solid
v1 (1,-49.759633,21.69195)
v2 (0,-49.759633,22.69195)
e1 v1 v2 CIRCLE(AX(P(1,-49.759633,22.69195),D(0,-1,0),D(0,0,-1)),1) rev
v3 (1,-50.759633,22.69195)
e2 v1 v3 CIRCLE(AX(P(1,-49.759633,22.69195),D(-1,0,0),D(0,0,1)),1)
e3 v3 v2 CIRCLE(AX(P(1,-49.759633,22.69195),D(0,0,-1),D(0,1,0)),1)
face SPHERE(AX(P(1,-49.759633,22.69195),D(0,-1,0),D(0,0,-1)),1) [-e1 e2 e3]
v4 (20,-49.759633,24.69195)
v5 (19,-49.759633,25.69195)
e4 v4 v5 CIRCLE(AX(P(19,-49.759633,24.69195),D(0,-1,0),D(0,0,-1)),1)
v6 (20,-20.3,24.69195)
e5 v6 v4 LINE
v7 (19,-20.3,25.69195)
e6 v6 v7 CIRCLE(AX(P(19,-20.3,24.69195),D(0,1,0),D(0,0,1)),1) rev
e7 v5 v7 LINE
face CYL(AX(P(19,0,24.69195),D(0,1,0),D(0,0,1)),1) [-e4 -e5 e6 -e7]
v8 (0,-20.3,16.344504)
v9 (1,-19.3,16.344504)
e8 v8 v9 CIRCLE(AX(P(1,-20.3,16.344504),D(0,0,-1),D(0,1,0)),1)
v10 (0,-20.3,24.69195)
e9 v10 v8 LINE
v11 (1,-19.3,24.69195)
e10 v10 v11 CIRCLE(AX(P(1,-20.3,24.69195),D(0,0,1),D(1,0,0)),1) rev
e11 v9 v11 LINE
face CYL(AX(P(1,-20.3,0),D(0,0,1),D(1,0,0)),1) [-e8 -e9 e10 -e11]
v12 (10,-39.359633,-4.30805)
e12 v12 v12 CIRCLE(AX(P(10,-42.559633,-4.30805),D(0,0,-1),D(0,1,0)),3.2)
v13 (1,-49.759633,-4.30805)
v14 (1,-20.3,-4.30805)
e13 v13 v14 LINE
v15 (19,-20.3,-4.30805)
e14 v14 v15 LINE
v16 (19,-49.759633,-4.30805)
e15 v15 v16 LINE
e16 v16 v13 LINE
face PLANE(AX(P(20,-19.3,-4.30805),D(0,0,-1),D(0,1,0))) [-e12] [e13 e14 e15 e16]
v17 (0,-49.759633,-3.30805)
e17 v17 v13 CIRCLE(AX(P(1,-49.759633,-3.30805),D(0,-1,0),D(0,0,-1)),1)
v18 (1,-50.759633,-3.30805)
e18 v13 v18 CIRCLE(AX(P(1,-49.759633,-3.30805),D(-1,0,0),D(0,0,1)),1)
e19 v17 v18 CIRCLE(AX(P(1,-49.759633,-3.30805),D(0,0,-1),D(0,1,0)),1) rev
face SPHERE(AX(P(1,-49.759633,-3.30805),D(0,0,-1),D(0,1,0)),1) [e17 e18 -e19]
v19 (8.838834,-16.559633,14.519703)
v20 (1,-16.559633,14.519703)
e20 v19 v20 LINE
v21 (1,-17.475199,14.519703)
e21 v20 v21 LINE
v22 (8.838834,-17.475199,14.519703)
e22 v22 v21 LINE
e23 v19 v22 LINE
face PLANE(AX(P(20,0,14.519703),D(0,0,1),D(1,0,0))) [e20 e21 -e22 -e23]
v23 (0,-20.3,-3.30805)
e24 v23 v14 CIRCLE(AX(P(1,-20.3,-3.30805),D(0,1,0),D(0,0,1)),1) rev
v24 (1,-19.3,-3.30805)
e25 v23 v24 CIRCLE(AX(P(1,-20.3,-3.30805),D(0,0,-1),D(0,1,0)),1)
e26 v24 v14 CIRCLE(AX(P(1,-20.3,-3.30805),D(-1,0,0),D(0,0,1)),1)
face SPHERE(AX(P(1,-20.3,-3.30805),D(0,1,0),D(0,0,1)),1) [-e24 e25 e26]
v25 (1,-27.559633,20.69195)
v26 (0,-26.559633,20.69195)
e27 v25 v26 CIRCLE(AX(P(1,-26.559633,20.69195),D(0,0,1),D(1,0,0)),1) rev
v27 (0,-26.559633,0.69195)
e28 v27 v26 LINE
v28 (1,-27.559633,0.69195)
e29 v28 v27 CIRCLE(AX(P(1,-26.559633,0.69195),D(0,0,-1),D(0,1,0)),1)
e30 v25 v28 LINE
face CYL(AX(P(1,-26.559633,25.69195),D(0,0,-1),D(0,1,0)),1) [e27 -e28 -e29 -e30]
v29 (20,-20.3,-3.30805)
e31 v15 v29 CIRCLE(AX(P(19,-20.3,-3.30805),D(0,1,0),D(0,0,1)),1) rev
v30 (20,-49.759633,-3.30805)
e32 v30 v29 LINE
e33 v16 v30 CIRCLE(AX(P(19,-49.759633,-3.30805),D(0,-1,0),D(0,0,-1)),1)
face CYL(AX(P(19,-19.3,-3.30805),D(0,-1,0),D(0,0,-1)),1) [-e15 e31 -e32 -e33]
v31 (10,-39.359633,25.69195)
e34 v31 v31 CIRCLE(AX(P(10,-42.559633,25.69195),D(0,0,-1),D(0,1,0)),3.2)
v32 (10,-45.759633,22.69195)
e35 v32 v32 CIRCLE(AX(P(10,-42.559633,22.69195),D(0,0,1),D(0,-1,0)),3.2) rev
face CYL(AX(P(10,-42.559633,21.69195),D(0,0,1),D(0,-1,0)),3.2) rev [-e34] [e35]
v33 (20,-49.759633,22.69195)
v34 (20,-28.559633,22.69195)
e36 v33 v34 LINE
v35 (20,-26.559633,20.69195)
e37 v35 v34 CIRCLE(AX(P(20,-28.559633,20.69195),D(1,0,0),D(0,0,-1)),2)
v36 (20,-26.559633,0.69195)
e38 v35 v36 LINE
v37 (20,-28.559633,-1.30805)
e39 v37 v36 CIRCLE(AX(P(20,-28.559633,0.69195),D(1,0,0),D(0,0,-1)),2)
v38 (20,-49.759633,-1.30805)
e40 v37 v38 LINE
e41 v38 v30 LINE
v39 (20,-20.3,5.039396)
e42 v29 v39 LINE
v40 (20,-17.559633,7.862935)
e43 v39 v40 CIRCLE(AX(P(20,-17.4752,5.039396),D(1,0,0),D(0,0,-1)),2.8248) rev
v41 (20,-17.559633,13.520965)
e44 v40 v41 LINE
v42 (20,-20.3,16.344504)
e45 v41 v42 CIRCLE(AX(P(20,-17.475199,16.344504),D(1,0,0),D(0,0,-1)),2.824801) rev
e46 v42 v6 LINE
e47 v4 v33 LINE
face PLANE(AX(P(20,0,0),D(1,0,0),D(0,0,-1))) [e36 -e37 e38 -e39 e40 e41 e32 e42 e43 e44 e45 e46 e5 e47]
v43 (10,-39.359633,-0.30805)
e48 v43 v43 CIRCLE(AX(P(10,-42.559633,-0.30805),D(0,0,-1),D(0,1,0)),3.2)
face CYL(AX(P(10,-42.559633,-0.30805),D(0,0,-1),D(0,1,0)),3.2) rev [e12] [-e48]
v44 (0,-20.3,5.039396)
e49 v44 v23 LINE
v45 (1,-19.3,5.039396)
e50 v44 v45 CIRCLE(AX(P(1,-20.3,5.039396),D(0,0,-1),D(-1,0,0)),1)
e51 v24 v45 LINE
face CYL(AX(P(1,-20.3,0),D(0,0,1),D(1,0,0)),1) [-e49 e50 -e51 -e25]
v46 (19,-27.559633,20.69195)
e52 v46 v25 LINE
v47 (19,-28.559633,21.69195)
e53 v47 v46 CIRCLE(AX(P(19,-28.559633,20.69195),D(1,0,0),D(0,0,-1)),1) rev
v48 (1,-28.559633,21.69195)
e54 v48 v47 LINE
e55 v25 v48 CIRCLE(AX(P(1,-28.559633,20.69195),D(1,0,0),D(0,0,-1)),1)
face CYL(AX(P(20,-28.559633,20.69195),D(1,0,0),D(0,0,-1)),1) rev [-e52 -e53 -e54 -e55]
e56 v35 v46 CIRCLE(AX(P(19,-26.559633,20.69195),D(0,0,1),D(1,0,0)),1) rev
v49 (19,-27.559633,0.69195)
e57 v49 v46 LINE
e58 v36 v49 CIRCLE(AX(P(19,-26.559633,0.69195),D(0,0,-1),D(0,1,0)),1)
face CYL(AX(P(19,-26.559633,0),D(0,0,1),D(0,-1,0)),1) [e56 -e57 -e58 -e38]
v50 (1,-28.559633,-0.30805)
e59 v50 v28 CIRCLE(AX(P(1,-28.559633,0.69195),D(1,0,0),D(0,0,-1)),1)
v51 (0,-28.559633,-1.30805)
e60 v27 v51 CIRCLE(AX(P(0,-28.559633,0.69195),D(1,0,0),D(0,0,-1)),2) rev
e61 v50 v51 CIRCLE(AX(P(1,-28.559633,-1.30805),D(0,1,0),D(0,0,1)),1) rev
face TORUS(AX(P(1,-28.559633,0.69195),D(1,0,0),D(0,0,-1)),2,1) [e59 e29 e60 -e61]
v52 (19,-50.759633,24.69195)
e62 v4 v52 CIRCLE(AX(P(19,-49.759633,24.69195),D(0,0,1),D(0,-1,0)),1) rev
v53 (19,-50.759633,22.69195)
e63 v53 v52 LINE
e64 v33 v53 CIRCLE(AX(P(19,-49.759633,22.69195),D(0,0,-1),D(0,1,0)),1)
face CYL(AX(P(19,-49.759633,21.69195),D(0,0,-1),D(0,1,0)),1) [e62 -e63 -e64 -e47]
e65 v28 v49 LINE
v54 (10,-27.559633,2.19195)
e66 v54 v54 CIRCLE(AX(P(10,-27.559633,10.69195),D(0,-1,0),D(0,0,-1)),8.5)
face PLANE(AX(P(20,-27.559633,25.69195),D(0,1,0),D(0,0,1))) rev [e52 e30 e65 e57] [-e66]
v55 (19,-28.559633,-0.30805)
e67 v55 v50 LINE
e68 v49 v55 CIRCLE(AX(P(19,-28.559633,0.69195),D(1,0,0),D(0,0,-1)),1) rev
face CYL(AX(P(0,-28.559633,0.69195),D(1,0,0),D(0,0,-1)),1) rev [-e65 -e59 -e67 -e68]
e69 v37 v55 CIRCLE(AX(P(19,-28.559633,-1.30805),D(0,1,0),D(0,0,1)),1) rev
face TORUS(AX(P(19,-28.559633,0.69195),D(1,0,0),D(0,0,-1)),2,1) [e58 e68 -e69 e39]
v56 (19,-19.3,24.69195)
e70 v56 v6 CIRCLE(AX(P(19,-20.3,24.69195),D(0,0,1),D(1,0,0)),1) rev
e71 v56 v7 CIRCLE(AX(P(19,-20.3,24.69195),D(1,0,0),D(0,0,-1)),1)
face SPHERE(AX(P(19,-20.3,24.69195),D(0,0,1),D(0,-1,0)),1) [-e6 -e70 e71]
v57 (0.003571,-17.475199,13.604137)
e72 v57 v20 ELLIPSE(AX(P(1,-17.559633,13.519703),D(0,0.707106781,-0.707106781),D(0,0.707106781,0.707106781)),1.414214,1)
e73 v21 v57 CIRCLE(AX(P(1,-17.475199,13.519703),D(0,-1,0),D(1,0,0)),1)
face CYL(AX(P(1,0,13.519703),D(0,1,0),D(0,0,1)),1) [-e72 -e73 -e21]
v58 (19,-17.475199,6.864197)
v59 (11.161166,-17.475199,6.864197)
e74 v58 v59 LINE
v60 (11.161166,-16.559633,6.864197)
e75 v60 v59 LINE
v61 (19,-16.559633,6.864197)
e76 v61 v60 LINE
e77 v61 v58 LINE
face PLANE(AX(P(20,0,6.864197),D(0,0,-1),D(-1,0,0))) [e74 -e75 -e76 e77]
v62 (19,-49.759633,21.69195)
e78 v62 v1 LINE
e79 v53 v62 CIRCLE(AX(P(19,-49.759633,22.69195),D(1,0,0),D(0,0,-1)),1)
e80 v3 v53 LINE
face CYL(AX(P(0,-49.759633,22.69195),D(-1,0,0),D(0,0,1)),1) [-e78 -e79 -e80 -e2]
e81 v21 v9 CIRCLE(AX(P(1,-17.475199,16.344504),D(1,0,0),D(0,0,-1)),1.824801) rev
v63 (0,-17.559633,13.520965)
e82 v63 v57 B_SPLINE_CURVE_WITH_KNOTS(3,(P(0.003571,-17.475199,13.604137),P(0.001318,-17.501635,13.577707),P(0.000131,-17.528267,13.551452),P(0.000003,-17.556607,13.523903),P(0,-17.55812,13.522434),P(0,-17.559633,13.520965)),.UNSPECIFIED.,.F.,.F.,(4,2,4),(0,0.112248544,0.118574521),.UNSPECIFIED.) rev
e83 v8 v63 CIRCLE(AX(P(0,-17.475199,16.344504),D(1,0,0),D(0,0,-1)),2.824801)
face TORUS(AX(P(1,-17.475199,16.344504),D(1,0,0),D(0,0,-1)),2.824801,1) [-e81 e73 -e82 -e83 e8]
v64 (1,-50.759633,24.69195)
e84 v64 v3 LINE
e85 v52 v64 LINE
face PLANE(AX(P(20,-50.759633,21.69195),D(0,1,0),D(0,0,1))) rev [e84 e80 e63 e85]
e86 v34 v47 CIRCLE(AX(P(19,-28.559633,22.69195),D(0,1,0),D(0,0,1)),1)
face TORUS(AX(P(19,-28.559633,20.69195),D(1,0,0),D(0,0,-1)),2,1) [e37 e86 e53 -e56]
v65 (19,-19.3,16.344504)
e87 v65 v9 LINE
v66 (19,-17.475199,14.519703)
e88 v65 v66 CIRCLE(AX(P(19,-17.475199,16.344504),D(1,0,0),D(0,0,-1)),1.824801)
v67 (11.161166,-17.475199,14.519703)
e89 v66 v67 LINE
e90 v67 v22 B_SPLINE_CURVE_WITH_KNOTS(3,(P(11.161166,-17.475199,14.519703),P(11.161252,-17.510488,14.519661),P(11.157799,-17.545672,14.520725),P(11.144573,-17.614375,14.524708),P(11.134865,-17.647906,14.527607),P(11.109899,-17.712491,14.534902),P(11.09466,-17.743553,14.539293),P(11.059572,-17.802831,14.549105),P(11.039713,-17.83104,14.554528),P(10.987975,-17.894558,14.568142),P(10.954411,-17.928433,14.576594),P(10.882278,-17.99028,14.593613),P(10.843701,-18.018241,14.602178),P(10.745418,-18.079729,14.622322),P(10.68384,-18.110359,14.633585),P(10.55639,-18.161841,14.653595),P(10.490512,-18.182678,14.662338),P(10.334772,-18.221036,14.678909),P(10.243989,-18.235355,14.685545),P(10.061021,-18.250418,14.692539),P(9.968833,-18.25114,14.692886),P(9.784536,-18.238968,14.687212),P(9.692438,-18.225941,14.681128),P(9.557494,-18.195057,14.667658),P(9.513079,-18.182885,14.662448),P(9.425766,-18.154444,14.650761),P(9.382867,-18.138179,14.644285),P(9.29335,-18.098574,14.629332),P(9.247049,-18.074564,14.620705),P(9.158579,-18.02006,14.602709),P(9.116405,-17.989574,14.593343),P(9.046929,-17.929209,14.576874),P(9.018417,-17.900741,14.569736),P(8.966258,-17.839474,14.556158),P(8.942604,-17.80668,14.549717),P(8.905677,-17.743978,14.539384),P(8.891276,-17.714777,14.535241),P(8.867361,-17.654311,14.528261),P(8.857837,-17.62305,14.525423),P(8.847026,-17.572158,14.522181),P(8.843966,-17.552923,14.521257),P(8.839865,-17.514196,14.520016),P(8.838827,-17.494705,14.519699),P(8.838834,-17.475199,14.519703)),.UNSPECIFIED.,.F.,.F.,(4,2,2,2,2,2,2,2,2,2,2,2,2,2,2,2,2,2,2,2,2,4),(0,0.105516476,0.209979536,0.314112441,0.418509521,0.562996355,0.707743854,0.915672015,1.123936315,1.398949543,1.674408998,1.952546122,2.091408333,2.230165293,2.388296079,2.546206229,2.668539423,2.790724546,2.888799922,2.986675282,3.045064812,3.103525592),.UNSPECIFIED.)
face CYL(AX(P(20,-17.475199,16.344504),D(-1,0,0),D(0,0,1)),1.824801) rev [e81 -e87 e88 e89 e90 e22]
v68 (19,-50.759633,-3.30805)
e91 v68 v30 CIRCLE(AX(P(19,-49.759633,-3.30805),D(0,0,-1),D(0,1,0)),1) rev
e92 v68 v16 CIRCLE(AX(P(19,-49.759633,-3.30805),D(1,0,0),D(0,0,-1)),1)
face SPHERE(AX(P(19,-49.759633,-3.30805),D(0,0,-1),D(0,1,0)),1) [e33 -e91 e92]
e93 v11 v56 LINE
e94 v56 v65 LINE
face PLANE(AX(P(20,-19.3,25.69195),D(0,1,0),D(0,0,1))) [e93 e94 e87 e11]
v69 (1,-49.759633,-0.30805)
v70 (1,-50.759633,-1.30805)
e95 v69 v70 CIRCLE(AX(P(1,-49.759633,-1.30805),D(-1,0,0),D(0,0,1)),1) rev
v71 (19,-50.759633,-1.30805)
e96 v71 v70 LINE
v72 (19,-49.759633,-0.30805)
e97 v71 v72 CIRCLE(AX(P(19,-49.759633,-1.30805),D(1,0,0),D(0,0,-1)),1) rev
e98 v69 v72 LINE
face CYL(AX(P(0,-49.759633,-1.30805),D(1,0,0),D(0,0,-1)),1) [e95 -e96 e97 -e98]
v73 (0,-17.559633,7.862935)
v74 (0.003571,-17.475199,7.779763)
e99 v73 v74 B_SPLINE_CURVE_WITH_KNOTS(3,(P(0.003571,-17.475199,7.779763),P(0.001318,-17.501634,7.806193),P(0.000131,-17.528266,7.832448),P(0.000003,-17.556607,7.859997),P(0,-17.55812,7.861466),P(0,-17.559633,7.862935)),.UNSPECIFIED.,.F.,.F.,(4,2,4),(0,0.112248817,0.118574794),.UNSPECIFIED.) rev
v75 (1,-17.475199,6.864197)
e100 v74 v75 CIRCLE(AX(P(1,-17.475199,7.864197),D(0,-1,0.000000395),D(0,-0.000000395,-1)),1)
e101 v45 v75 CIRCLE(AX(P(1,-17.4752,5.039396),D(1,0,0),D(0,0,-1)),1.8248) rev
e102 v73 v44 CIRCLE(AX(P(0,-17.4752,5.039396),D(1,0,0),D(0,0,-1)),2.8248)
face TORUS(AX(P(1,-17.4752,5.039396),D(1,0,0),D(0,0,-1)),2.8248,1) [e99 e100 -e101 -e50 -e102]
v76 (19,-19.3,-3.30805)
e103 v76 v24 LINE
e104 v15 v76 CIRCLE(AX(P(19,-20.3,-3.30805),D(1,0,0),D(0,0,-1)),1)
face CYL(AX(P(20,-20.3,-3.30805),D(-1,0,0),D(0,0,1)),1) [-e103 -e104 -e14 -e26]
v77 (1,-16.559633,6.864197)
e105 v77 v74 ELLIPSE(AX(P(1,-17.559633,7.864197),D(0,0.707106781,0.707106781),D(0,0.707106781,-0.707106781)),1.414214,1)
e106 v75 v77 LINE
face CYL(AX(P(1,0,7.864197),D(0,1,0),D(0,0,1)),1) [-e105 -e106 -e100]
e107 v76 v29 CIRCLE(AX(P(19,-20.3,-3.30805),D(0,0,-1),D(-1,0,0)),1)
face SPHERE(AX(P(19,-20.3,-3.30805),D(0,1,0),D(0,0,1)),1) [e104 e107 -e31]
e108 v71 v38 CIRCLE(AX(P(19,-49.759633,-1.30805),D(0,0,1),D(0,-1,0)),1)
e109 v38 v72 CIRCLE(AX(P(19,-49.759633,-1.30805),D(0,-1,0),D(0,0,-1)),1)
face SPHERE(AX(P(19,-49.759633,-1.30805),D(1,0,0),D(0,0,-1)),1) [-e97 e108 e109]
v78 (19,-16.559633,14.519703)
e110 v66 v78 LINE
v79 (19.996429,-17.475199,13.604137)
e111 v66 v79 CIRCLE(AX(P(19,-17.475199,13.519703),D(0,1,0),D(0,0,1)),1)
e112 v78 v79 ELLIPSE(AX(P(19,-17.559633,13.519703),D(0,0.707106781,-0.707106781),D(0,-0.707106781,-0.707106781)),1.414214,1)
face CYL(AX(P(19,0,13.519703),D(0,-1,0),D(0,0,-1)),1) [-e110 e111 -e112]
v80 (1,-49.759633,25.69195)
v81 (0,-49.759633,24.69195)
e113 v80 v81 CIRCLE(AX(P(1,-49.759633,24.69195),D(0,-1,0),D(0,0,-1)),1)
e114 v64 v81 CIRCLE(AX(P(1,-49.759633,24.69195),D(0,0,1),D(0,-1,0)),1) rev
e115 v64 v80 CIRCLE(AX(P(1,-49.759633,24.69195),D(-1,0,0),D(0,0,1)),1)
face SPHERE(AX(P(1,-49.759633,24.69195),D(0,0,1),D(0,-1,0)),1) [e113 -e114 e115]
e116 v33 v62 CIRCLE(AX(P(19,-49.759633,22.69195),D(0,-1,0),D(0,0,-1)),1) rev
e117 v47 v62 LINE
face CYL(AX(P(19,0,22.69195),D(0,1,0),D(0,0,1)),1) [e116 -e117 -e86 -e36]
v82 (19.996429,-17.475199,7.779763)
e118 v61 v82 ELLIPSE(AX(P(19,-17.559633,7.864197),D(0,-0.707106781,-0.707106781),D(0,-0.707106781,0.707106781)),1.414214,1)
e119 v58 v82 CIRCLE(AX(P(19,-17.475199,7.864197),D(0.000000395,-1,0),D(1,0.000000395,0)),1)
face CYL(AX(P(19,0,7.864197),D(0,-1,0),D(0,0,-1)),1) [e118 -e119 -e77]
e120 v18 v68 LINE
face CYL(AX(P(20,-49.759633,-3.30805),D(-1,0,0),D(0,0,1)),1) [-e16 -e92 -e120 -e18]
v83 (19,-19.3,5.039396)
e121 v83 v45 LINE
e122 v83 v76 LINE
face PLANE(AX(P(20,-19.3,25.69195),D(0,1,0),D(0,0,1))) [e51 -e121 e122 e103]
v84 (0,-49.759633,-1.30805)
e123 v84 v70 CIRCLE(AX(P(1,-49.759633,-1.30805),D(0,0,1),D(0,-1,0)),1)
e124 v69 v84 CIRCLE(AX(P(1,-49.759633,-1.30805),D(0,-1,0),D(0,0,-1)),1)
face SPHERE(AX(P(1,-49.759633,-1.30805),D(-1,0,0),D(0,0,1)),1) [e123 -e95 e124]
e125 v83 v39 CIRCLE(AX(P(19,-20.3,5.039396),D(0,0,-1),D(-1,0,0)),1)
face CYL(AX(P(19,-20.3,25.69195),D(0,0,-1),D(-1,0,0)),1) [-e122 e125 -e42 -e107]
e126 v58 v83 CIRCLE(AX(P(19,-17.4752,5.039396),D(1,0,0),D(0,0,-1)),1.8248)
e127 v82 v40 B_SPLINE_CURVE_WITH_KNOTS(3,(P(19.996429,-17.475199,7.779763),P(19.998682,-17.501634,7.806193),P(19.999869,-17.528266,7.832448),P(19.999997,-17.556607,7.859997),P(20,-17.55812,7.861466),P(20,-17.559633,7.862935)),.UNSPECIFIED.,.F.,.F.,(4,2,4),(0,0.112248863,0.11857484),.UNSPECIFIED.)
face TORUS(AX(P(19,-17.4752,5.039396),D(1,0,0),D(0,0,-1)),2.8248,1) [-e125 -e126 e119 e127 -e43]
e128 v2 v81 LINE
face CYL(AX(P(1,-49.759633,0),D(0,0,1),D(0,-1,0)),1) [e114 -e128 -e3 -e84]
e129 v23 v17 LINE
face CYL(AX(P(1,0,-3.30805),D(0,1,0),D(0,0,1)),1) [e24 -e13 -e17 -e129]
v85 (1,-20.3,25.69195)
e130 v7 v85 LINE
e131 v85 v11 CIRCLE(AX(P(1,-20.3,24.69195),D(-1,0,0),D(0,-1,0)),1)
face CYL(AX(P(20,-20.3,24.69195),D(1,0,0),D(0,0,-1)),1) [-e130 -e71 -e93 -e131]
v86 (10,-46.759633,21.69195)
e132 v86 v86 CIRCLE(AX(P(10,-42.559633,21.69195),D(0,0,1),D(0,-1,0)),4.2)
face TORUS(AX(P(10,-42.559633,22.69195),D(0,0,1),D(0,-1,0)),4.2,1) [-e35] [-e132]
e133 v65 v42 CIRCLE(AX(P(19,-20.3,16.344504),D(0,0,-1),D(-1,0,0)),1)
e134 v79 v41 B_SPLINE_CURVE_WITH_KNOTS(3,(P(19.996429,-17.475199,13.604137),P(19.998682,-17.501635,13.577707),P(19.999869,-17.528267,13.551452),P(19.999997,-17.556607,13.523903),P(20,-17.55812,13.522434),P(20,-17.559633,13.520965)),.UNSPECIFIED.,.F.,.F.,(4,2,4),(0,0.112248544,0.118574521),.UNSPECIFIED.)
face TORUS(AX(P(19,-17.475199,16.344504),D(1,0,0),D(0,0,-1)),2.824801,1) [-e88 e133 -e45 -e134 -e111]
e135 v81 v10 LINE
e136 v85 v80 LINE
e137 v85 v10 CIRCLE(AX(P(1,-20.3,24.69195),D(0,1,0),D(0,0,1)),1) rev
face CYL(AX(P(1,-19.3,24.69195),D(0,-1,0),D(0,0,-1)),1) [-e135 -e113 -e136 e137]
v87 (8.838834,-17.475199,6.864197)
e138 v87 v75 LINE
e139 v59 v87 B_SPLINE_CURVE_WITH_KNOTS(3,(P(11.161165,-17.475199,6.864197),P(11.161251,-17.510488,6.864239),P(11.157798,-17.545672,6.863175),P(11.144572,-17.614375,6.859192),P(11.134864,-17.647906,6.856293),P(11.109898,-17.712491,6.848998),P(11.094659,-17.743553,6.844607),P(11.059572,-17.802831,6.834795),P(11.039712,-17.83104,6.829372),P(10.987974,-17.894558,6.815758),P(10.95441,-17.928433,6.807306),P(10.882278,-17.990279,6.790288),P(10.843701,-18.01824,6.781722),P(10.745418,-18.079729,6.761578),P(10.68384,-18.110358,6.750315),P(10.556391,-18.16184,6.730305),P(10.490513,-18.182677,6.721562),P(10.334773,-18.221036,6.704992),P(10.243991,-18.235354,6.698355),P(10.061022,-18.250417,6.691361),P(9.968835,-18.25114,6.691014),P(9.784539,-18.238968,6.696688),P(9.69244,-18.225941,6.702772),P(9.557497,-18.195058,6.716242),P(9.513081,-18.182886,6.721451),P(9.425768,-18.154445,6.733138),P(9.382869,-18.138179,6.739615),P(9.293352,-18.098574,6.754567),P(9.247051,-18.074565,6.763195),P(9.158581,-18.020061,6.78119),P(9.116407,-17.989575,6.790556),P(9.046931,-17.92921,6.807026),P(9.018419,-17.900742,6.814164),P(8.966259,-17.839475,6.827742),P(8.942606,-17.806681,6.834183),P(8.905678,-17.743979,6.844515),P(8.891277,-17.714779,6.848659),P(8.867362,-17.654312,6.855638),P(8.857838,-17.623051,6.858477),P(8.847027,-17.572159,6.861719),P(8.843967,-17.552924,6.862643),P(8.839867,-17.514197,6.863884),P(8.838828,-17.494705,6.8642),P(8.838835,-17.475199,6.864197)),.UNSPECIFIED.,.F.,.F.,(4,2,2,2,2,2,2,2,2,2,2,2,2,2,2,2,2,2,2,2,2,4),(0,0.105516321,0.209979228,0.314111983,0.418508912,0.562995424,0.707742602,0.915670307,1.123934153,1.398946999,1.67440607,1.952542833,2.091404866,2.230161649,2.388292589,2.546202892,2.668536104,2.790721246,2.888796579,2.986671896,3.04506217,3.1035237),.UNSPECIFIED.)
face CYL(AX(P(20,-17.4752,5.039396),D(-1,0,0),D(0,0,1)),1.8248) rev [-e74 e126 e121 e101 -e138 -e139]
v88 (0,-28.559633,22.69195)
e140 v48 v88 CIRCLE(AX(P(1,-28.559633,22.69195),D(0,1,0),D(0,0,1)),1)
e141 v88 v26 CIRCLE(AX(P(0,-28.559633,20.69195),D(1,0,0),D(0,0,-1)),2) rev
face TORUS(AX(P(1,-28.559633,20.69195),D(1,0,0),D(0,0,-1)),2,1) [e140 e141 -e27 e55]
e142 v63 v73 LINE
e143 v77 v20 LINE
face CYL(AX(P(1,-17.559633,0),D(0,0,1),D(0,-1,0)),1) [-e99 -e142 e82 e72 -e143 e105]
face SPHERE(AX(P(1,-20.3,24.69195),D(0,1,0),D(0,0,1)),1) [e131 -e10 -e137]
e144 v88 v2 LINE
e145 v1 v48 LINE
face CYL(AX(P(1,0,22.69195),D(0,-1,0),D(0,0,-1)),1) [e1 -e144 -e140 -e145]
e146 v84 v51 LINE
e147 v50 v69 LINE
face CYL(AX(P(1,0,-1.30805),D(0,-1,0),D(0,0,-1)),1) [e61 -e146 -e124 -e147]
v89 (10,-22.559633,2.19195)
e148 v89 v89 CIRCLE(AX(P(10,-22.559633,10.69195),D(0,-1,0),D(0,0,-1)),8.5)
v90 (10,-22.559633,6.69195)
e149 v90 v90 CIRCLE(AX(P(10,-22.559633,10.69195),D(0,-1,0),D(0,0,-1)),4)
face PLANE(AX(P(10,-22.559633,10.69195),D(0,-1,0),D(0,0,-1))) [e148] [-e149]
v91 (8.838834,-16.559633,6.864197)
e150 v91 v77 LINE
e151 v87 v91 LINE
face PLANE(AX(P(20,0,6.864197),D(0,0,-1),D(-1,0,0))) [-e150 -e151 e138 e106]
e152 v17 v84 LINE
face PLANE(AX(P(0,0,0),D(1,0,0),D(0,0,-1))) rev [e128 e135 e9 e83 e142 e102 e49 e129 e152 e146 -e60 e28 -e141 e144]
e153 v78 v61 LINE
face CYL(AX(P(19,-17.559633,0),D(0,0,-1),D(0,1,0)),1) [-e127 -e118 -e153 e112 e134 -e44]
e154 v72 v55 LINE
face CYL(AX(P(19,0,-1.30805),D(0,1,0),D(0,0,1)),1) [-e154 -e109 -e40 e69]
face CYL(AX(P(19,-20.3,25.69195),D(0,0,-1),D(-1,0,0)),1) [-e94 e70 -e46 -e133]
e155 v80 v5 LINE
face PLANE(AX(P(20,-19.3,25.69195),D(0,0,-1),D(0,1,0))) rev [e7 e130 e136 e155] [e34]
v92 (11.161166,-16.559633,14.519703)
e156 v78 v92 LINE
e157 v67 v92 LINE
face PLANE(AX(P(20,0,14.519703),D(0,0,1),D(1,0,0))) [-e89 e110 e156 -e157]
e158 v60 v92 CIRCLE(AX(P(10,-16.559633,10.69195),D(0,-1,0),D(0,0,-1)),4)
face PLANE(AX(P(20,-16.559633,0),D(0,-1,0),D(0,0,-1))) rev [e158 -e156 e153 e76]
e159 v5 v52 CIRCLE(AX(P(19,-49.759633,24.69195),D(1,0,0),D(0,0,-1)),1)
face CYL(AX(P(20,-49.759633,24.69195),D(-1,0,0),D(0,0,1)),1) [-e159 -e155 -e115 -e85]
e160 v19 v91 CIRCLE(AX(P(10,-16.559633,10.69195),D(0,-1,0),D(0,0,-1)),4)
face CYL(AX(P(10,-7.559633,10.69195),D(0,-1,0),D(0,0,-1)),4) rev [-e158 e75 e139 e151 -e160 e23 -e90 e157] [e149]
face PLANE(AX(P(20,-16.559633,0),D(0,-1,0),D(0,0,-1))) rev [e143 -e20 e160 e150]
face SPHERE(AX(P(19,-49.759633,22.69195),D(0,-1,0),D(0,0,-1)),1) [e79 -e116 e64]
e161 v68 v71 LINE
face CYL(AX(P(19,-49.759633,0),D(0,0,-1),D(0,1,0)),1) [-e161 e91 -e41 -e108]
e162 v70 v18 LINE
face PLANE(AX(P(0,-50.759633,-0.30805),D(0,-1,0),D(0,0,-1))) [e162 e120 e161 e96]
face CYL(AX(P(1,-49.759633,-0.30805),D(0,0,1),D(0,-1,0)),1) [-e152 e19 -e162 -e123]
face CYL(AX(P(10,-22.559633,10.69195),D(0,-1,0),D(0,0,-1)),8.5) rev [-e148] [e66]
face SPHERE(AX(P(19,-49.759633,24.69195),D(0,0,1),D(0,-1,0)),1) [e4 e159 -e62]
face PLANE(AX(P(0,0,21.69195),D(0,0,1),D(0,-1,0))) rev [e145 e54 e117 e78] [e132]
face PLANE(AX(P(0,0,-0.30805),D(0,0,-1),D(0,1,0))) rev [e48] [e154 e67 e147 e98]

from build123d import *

# Parameters (mm, degrees)
SKETCH1_W           = 30
SKETCH1_H           = 8.25963266
BOSS_EXTRUDE1_DEPTH = 20
SKETCH2_R           = 4
CUT_EXTRUDE1_DEPTH  = 20
SKETCH2_3_R         = 8.5
SKETCH2_3_R_2       = 4
CUT_EXTRUDE2_DEPTH  = 5
SKETCH3_W           = 20
SKETCH3_H           = 23.2
SKETCH3_R           = 5
SKETCH3_R_2         = 3.2
BOSS_EXTRUDE2_DEPTH = 4
BOSS_EXTRUDE3_START = -26
SKETCH3_3_W         = 20
SKETCH3_3_H         = 23.2
SKETCH3_3_R         = 5
SKETCH3_3_R_2       = 3.2
BOSS_EXTRUDE3_DEPTH = 4
FILLET1_R           = 1


with BuildPart() as part:
    # Sketch1 → Boss-Extrude1 (new body)
    with BuildSketch(Plane(origin=(0, 0, 0), x_dir=(0, 0, -1), z_dir=(1, 0, 0))):
        with Locations((-10.691950058, -23.429816412)):
            Rectangle(SKETCH1_W, SKETCH1_H)
        with BuildLine():
            Line((-16.344503942, -19.300000082), (-5.039396175, -19.300000082))
            ThreePointArc((-5.039396175, -19.300000082), (-6.329725463, -18.765528762), (-6.864196994, -17.475199263))
            Line((-6.864196994, -17.475199263), (-6.864196994, -16.559632742))
            Line((-6.864196994, -16.559632742), (-14.519703122, -16.559632742))
            Line((-14.519703122, -16.559632742), (-14.519703122, -17.475199263))
            ThreePointArc((-14.519703122, -17.475199263), (-15.054174908, -18.765528296), (-16.344503942, -19.300000082))
        make_face()
    extrude(amount=BOSS_EXTRUDE1_DEPTH)

    # Sketch2 → Cut-Extrude1 (cut)
    with BuildSketch(Plane.XZ.offset(27.559632742)):
        with Locations(Location((10, 10.691950058, 0), (0, 0, 270))):
            Circle(SKETCH2_R)
    extrude(amount=-CUT_EXTRUDE1_DEPTH, mode=Mode.SUBTRACT)

    # Sketch2<3> → Cut-Extrude2 (cut)
    with BuildSketch(Plane.XZ.offset(27.559632742)):
        with Locations(Location((10, 10.691950058, 0), (0, 0, 270))):
            Circle(SKETCH2_3_R)
        with Locations(Location((10, 10.691950058, 0), (0, 0, 270))):
            Circle(SKETCH2_3_R_2, mode=Mode.SUBTRACT)
    extrude(amount=-CUT_EXTRUDE2_DEPTH, mode=Mode.SUBTRACT)

    # Sketch3 → Boss-Extrude2 (add)
    # profile 1 of 2: a face of its own
    with BuildSketch(Plane(origin=(0, 0, -4.308049942), x_dir=(-1, 0, 0), z_dir=(0, 0, -1))):
        with Locations((-10, -39.159632742)):
            Rectangle(SKETCH3_W, SKETCH3_H)
        with Locations((-10, -42.559632742)):
            Circle(SKETCH3_R, mode=Mode.SUBTRACT)
    # profile 2 of 2: a face of its own
    with BuildSketch(Plane(origin=(0, 0, -4.308049942), x_dir=(-1, 0, 0), z_dir=(0, 0, -1))):
        with Locations((-10, -42.559632742)):
            Circle(SKETCH3_R)
        with Locations(Location((-10, -42.559632742, 0), (0, 0, 90))):
            Circle(SKETCH3_R_2, mode=Mode.SUBTRACT)
    extrude(amount=-BOSS_EXTRUDE2_DEPTH)

    # Sketch3<3> → Boss-Extrude3 (add)
    # profile 1 of 2: a face of its own
    with BuildSketch(Plane(origin=(0, 0, -4.308049942), x_dir=(-1, 0, 0), z_dir=(0, 0, -1)).offset(BOSS_EXTRUDE3_START)):
        with Locations((-10, -39.159632742)):
            Rectangle(SKETCH3_3_W, SKETCH3_3_H)
        with Locations((-10, -42.559632742)):
            Circle(SKETCH3_3_R, mode=Mode.SUBTRACT)
    # profile 2 of 2: a face of its own
    with BuildSketch(Plane(origin=(0, 0, -4.308049942), x_dir=(-1, 0, 0), z_dir=(0, 0, -1)).offset(BOSS_EXTRUDE3_START)):
        with Locations((-10, -42.559632742)):
            Circle(SKETCH3_3_R)
        with Locations(Location((-10, -42.559632742, 0), (0, 0, 90))):
            Circle(SKETCH3_3_R_2, mode=Mode.SUBTRACT)
    extrude(amount=-BOSS_EXTRUDE3_DEPTH)

    # Fillet1
    # the kernel refuses this fillet: 1 mm, written as the material it adds along each edge
    with BuildSketch(Plane(origin=(20, -27.559632742, -0.308049942), x_dir=(0, 0, 1), z_dir=(-1, 0, 0)), Plane(origin=(20, -27.559632742, 21.691950058), x_dir=(0, -1, 0), z_dir=(-1, 0, 0))) as fillet1_piece_1:
        with BuildLine():
            CenterArc((FILLET1_R, -FILLET1_R), FILLET1_R, 90, 90)
            Line((0, -FILLET1_R), (0, 0))
            Line((0, 0), (FILLET1_R, 0))
        make_face()
    extrude(amount=20)
    # the kernel refuses this fillet: 1 mm, written as the material it takes off along each edge
    with BuildSketch(Plane(origin=(19, -20.300000082, -3.308049942), x_dir=(0, 0, -1), z_dir=(0, 1, 0))) as fillet1_2_piece_1_section:
        Polygon((0, 0), (FILLET1_R, 0), (FILLET1_R, -FILLET1_R), (0, -FILLET1_R), align=None)
    fillet1_2_piece_1 = extrude(amount=FILLET1_R, mode=Mode.PRIVATE)
    fillet1_2_piece_1 = fillet1_2_piece_1 - Plane(origin=(19, -20.300000082, -3.308049942), x_dir=(-0.7071067811865475, -2.5852550975749018e-14, 0.7071067811865475), z_dir=(0, 1, 0)) * Sphere(FILLET1_R, mode=Mode.PRIVATE)
    add(fillet1_2_piece_1, mode=Mode.SUBTRACT)
    with BuildSketch(Plane(origin=(19, -49.759632742, -3.308049942), x_dir=(0, 0, -1), z_dir=(0, -1, 0))) as fillet1_2_piece_2_section:
        Polygon((0, 0), (FILLET1_R, 0), (FILLET1_R, FILLET1_R), (0, FILLET1_R), align=None)
    fillet1_2_piece_2 = extrude(amount=FILLET1_R, mode=Mode.PRIVATE)
    fillet1_2_piece_2 = fillet1_2_piece_2 - Plane(origin=(19, -49.759632742, -3.308049942), x_dir=(-0.7071067811865475, -2.5852550975749018e-14, 0.7071067811865475), z_dir=(0, -1, 0)) * Sphere(FILLET1_R, mode=Mode.PRIVATE)
    add(fillet1_2_piece_2, mode=Mode.SUBTRACT)
    with BuildSketch(Plane(origin=(19, -20.300000082, 24.691950058), x_dir=(1, 0, 0), z_dir=(0, 1, 0))) as fillet1_2_piece_3_section:
        Polygon((0, 0), (FILLET1_R, 0), (FILLET1_R, -FILLET1_R), (0, -FILLET1_R), align=None)
    fillet1_2_piece_3 = extrude(amount=FILLET1_R, mode=Mode.PRIVATE)
    fillet1_2_piece_3 = fillet1_2_piece_3 - Plane(origin=(19, -20.300000082, 24.691950058), x_dir=(-0.7071067811865475, 2.5852550975749008e-14, -0.7071067811865475), z_dir=(0, 1, 0)) * Sphere(FILLET1_R, mode=Mode.PRIVATE)
    add(fillet1_2_piece_3, mode=Mode.SUBTRACT)
    with BuildSketch(Plane(origin=(19, -49.759632742, 24.691950058), x_dir=(0, 0, 1), z_dir=(1, 0, 0))) as fillet1_2_piece_4_section:
        Polygon((0, 0), (FILLET1_R, 0), (FILLET1_R, FILLET1_R), (0, FILLET1_R), align=None)
    fillet1_2_piece_4 = extrude(amount=FILLET1_R, mode=Mode.PRIVATE)
    fillet1_2_piece_4 = fillet1_2_piece_4 - Plane(origin=(19, -49.759632742, 24.691950058), x_dir=(0, 0.7071067811865733, -0.7071067811865216), z_dir=(1, 0, 0)) * Sphere(FILLET1_R, mode=Mode.PRIVATE)
    add(fillet1_2_piece_4, mode=Mode.SUBTRACT)
    with BuildSketch(Plane(origin=(1, -20.300000082, 24.691950058), x_dir=(-1, 0, 0), z_dir=(0, 1, 0))) as fillet1_2_piece_5_section:
        Polygon((0, 0), (FILLET1_R, 0), (FILLET1_R, FILLET1_R), (0, FILLET1_R), align=None)
    fillet1_2_piece_5 = extrude(amount=FILLET1_R, mode=Mode.PRIVATE)
    fillet1_2_piece_5 = fillet1_2_piece_5 - Plane(origin=(1, -20.300000082, 24.691950058), x_dir=(0.7071067811865475, 2.5852550975749008e-14, -0.7071067811865475), z_dir=(0, 1, 0)) * Sphere(FILLET1_R, mode=Mode.PRIVATE)
    add(fillet1_2_piece_5, mode=Mode.SUBTRACT)
    with BuildSketch(Plane(origin=(1, -49.759632742, 24.691950058), x_dir=(0, 0, 1), z_dir=(-1, 0, 0))) as fillet1_2_piece_6_section:
        Polygon((0, 0), (FILLET1_R, 0), (FILLET1_R, -FILLET1_R), (0, -FILLET1_R), align=None)
    fillet1_2_piece_6 = extrude(amount=FILLET1_R, mode=Mode.PRIVATE)
    fillet1_2_piece_6 = fillet1_2_piece_6 - Plane(origin=(1, -49.759632742, 24.691950058), x_dir=(0, 0.7071067811865733, -0.7071067811865216), z_dir=(-1, 0, 0)) * Sphere(FILLET1_R, mode=Mode.PRIVATE)
    add(fillet1_2_piece_6, mode=Mode.SUBTRACT)
    with BuildSketch(Plane(origin=(1, -49.759632742, -3.308049942), x_dir=(0, 0, -1), z_dir=(-1, 0, 0))) as fillet1_2_piece_7_section:
        Polygon((0, 0), (FILLET1_R, 0), (FILLET1_R, FILLET1_R), (0, FILLET1_R), align=None)
    fillet1_2_piece_7 = extrude(amount=FILLET1_R, mode=Mode.PRIVATE)
    fillet1_2_piece_7 = fillet1_2_piece_7 - Plane(origin=(1, -49.759632742, -3.308049942), x_dir=(0, 0.7071067811865216, 0.7071067811865733), z_dir=(-1, 0, 0)) * Sphere(FILLET1_R, mode=Mode.PRIVATE)
    add(fillet1_2_piece_7, mode=Mode.SUBTRACT)
    with BuildSketch(Plane(origin=(1, -20.300000082, -3.308049942), x_dir=(0, 0, -1), z_dir=(-1, 0, 0))) as fillet1_2_piece_8_section:
        Polygon((0, 0), (FILLET1_R, 0), (FILLET1_R, -FILLET1_R), (0, -FILLET1_R), align=None)
    fillet1_2_piece_8 = extrude(amount=FILLET1_R, mode=Mode.PRIVATE)
    fillet1_2_piece_8 = fillet1_2_piece_8 - Plane(origin=(1, -20.300000082, -3.308049942), x_dir=(0, -0.7071067811865605, 0.7071067811865346), z_dir=(-1, 0, 0)) * Sphere(FILLET1_R, mode=Mode.PRIVATE)
    add(fillet1_2_piece_8, mode=Mode.SUBTRACT)
    with BuildSketch(Plane(origin=(-2.5, -50.759632742, -0.308049942), x_dir=(0, 0, -1), z_dir=(1, 0, 0)), Plane(origin=(-2.5, -50.759632742, 21.691950058), x_dir=(0, 1, 0), z_dir=(1, 0, 0))) as fillet1_2_piece_9:
        with BuildLine():
            CenterArc((FILLET1_R, FILLET1_R), FILLET1_R, 180, 90)
            Line((0, FILLET1_R), (0, 0))
            Line((0, 0), (FILLET1_R, 0))
        make_face()
    extrude(amount=25, mode=Mode.SUBTRACT)
    with BuildSketch(Plane(origin=(20, -19.300000082, 5.039396175), x_dir=(0, -1, 0), z_dir=(0, 0, -1)), Plane(origin=(0, -19.300000082, 24.691950058), x_dir=(1, 0, 0), z_dir=(0, 0, -1))) as fillet1_2_piece_10:
        with BuildLine():
            CenterArc((FILLET1_R, FILLET1_R), FILLET1_R, 180, 90)
            Line((0, FILLET1_R), (0, 0))
            Line((0, 0), (FILLET1_R, 0))
        make_face()
    extrude(amount=8.347446117, mode=Mode.SUBTRACT)
    with BuildSketch(Plane(origin=(20, -49.759632742, -4.308049942), x_dir=(0, 0, 1), z_dir=(0, 1, 0)), Plane(origin=(20, -20.300000082, 25.691950058), x_dir=(0, 0, -1), z_dir=(0, -1, 0)), Plane(origin=(0, -49.759632742, 25.691950058), x_dir=(0, 0, -1), z_dir=(0, 1, 0)), Plane(origin=(0, -20.300000082, -4.308049942), x_dir=(0, 0, 1), z_dir=(0, -1, 0))) as fillet1_2_piece_11:
        with BuildLine():
            CenterArc((FILLET1_R, -FILLET1_R), FILLET1_R, 90, 90)
            Line((0, -FILLET1_R), (0, 0))
            Line((0, 0), (FILLET1_R, 0))
        make_face()
    extrude(amount=29.45963266, mode=Mode.SUBTRACT)
    with BuildSketch(Plane(origin=(20, -50.759632742, -3.308049942), x_dir=(0, 1, 0), z_dir=(0, 0, 1)), Plane(origin=(20, -50.759632742, 19.191950058), x_dir=(0, 1, 0), z_dir=(0, 0, 1))) as fillet1_2_piece_12:
        with BuildLine():
            CenterArc((FILLET1_R, FILLET1_R), FILLET1_R, 180, 90)
            Line((0, FILLET1_R), (0, 0))
            Line((0, 0), (FILLET1_R, 0))
        make_face()
    extrude(amount=5.5, mode=Mode.SUBTRACT)
    with BuildSketch(Plane(origin=(20, -19.300000082, 24.691950058), x_dir=(-1, 0, 0), z_dir=(0, 0, -1)), Plane(origin=(0, -19.300000082, 5.039396175), x_dir=(0, -1, 0), z_dir=(0, 0, -1))) as fillet1_2_piece_13:
        with BuildLine():
            CenterArc((FILLET1_R, -FILLET1_R), FILLET1_R, 90, 90)
            Line((0, -FILLET1_R), (0, 0))
            Line((0, 0), (FILLET1_R, 0))
        make_face()
    extrude(amount=8.347446117, mode=Mode.SUBTRACT)
    with BuildSketch(Plane(origin=(20, -17.475199263, 16.344503942), x_dir=(0, 0, -1), z_dir=(0, 1, 0))) as fillet1_2_piece_14:
        with BuildLine():
            CenterArc((1.824800819 + FILLET1_R, FILLET1_R), FILLET1_R, 180, 90)
            Line((1.824800819 + FILLET1_R, 0), (1.824800819, 0))
            Line((1.824800819, 0), (1.824800819, FILLET1_R))
        make_face()
    revolve(axis=Axis((20, -17.475199263, 16.344503942), (-1, 0, 0)), revolution_arc=90, mode=Mode.SUBTRACT)
    with BuildSketch(Plane(origin=(20, -16.559632742, 4.364196994), x_dir=(0, -1, 0), z_dir=(0, 0, 1))) as fillet1_2_piece_15:
        with BuildLine():
            CenterArc((FILLET1_R, -FILLET1_R), FILLET1_R, 90, 90)
            Line((0, -FILLET1_R), (0, 0))
            Line((0, 0), (FILLET1_R, 0))
        make_face()
    extrude(amount=12.655506128, mode=Mode.SUBTRACT)
    with BuildSketch(Plane(origin=(20, -17.475200493, 5.039397405), x_dir=(0, -0.9999999999997728, -6.741053946640154e-07), z_dir=(0, 6.741053946640154e-07, -0.9999999999997728))) as fillet1_2_piece_16:
        with BuildLine():
            CenterArc((1.824799589 + FILLET1_R, FILLET1_R), FILLET1_R, 180, 90)
            Line((1.824799589, FILLET1_R), (1.824799589, 0))
            Line((1.824799589, 0), (1.824799589 + FILLET1_R, 0))
        make_face()
    revolve(axis=Axis((20, -17.475200493, 5.039397405), (-1, 0, 0)), revolution_arc=90.000077247, mode=Mode.SUBTRACT)
    with BuildSketch(Plane(origin=(0, -16.559632742, 4.364196994), x_dir=(0, -1, 0), z_dir=(0, 0, 1))) as fillet1_2_piece_17:
        with BuildLine():
            CenterArc((FILLET1_R, FILLET1_R), FILLET1_R, 180, 90)
            Line((0, FILLET1_R), (0, 0))
            Line((0, 0), (FILLET1_R, 0))
        make_face()
    extrude(amount=12.655506128, mode=Mode.SUBTRACT)
    with BuildSketch(Plane(origin=(0, -17.475199263, 16.344503942), x_dir=(0, 0, -1), z_dir=(0, 1, 0))) as fillet1_2_piece_18:
        with BuildLine():
            CenterArc((1.824800819 + FILLET1_R, -FILLET1_R), FILLET1_R, 90, 90)
            Line((1.824800819, -FILLET1_R), (1.824800819, 0))
            Line((1.824800819, 0), (1.824800819 + FILLET1_R, 0))
        make_face()
    revolve(axis=Axis((0, -17.475199263, 16.344503942), (-1, 0, 0)), revolution_arc=90, mode=Mode.SUBTRACT)
    with BuildSketch(Plane(origin=(0, -50.759632742, -3.308049942), x_dir=(0, 1, 0), z_dir=(0, 0, 1)), Plane(origin=(0, -50.759632742, 19.191950058), x_dir=(0, 1, 0), z_dir=(0, 0, 1))) as fillet1_2_piece_19:
        with BuildLine():
            CenterArc((FILLET1_R, -FILLET1_R), FILLET1_R, 90, 90)
            Line((0, -FILLET1_R), (0, 0))
            Line((0, 0), (FILLET1_R, 0))
        make_face()
    extrude(amount=5.5, mode=Mode.SUBTRACT)
    with BuildSketch(Plane(origin=(0, -17.475200493, 5.039397405), x_dir=(0, -0.9999999999997728, -6.741053946640154e-07), z_dir=(0, 6.741053946640154e-07, -0.9999999999997728))) as fillet1_2_piece_20:
        with BuildLine():
            CenterArc((1.824799589 + FILLET1_R, -FILLET1_R), FILLET1_R, 90, 90)
            Line((1.824799589, -FILLET1_R), (1.824799589, 0))
            Line((1.824799589, 0), (1.824799589 + FILLET1_R, 0))
        make_face()
    revolve(axis=Axis((0, -17.475200493, 5.039397405), (-1, 0, 0)), revolution_arc=90.000077247, mode=Mode.SUBTRACT)
    with BuildSketch(Plane(origin=(1, -50.759632742, 25.691950058), x_dir=(0, 1.0, -2.3092638912203256e-12), z_dir=(1, 0, 0)), Plane(origin=(1, -19.300000082, 25.691950058), x_dir=(0, 0, -1), z_dir=(1, 0, 0))) as fillet1_2_piece_21:
        with BuildLine():
            CenterArc((FILLET1_R, -FILLET1_R), FILLET1_R, 90, 90)
            Line((0, -FILLET1_R), (0, 0))
            Line((0, 0), (FILLET1_R, 0))
        make_face()
    extrude(amount=18, mode=Mode.SUBTRACT)
    with BuildSketch(Plane(origin=(10, -42.559632742, 21.691950058), x_dir=(0, 1, 0), z_dir=(-1, 0, 0))) as fillet1_2_piece_22:
        with BuildLine():
            CenterArc((3.2 + FILLET1_R, -FILLET1_R), FILLET1_R, 90, 90)
            Line((3.2, -FILLET1_R), (3.2, 0))
            Line((3.2, 0), (3.2 + FILLET1_R, 0))
        make_face()
    revolve(axis=Axis((10, -42.559632742, 21.691950058), (0, 0, -1)), mode=Mode.SUBTRACT)
    with BuildSketch(Plane(origin=(1, -19.300000082, -4.308049942), x_dir=(0, 0, 1), z_dir=(1, 0, 0)), Plane(origin=(1, -50.759632742, -4.308049942), x_dir=(0, 1, 0), z_dir=(1, 0, 0))) as fillet1_2_piece_23:
        with BuildLine():
            CenterArc((FILLET1_R, FILLET1_R), FILLET1_R, 180, 90)
            Line((0, FILLET1_R), (0, 0))
            Line((0, 0), (FILLET1_R, 0))
        make_face()
    extrude(amount=18, mode=Mode.SUBTRACT)
    with BuildSketch(Plane(origin=(0, -17.475199263, 6.864196994), x_dir=(0, 0, 1), z_dir=(0, 1, 0)), Plane(origin=(0, -14.059632742, 14.519703122), x_dir=(0, 0, -1), z_dir=(0, -1, 0))) as fillet1_2_piece_24:
        with BuildLine():
            CenterArc((FILLET1_R, FILLET1_R), FILLET1_R, 180, 90)
            Line((0, FILLET1_R), (0, 0))
            Line((0, 0), (FILLET1_R, 0))
        make_face()
    extrude(amount=3.415566521, mode=Mode.SUBTRACT)
    with BuildSketch(Plane(origin=(20, -17.475199263, 6.864196994), x_dir=(0, 0, 1), z_dir=(0, 1, 0)), Plane(origin=(20, -14.059632742, 14.519703122), x_dir=(0, 0, -1), z_dir=(0, -1, 0))) as fillet1_2_piece_25:
        with BuildLine():
            CenterArc((FILLET1_R, -FILLET1_R), FILLET1_R, 90, 90)
            Line((0, -FILLET1_R), (0, 0))
            Line((0, 0), (FILLET1_R, 0))
        make_face()
    extrude(amount=3.415566521, mode=Mode.SUBTRACT)
    # the kernel refuses this fillet: 1 mm, written as the material it takes off along each edge
    with BuildSketch(Plane(origin=(1, -49.759632742, 22.691950058), x_dir=(0, 0, -1), z_dir=(-1, 0, 0))) as fillet1_3_piece_1_section:
        Polygon((0, 0), (FILLET1_R, 0), (FILLET1_R, FILLET1_R), (0, FILLET1_R), align=None)
    fillet1_3_piece_1 = extrude(amount=FILLET1_R, mode=Mode.PRIVATE)
    fillet1_3_piece_1 = fillet1_3_piece_1 - Plane(origin=(1, -49.759632742, 22.691950058), x_dir=(0, 0.7071067811865216, 0.7071067811865733), z_dir=(-1, 0, 0)) * Sphere(FILLET1_R, mode=Mode.PRIVATE)
    add(fillet1_3_piece_1, mode=Mode.SUBTRACT)
    with BuildSketch(Plane(origin=(19, -49.759632742, 22.691950058), x_dir=(0, 0, -1), z_dir=(1, 0, 0))) as fillet1_3_piece_2_section:
        Polygon((0, 0), (FILLET1_R, 0), (FILLET1_R, -FILLET1_R), (0, -FILLET1_R), align=None)
    fillet1_3_piece_2 = extrude(amount=FILLET1_R, mode=Mode.PRIVATE)
    fillet1_3_piece_2 = fillet1_3_piece_2 - Plane(origin=(19, -49.759632742, 22.691950058), x_dir=(0, 0.7071067811865216, 0.7071067811865733), z_dir=(1, 0, 0)) * Sphere(FILLET1_R, mode=Mode.PRIVATE)
    add(fillet1_3_piece_2, mode=Mode.SUBTRACT)
    with BuildSketch(Plane(origin=(1, -49.759632742, -1.308049942), x_dir=(0, 0, 1), z_dir=(-1, 0, 0))) as fillet1_3_piece_3_section:
        Polygon((0, 0), (FILLET1_R, 0), (FILLET1_R, -FILLET1_R), (0, -FILLET1_R), align=None)
    fillet1_3_piece_3 = extrude(amount=FILLET1_R, mode=Mode.PRIVATE)
    fillet1_3_piece_3 = fillet1_3_piece_3 - Plane(origin=(1, -49.759632742, -1.308049942), x_dir=(0, 0.7071067811865733, -0.7071067811865216), z_dir=(-1, 0, 0)) * Sphere(FILLET1_R, mode=Mode.PRIVATE)
    add(fillet1_3_piece_3, mode=Mode.SUBTRACT)
    with BuildSketch(Plane(origin=(19, -49.759632742, -1.308049942), x_dir=(0, 0, 1), z_dir=(1, 0, 0))) as fillet1_3_piece_4_section:
        Polygon((0, 0), (FILLET1_R, 0), (FILLET1_R, FILLET1_R), (0, FILLET1_R), align=None)
    fillet1_3_piece_4 = extrude(amount=FILLET1_R, mode=Mode.PRIVATE)
    fillet1_3_piece_4 = fillet1_3_piece_4 - Plane(origin=(19, -49.759632742, -1.308049942), x_dir=(0, 0.7071067811865733, -0.7071067811865216), z_dir=(1, 0, 0)) * Sphere(FILLET1_R, mode=Mode.PRIVATE)
    add(fillet1_3_piece_4, mode=Mode.SUBTRACT)
    with BuildSketch(Plane(origin=(20, -49.759632742, -0.308049942), x_dir=(0, 0, -1), z_dir=(0, 1, 0)), Plane(origin=(0, -28.559632742, -0.308049942), x_dir=(0, 0, -1), z_dir=(0, -1, 0))) as fillet1_3_piece_5:
        with BuildLine():
            CenterArc((FILLET1_R, FILLET1_R), FILLET1_R, 180, 90)
            Line((0, FILLET1_R), (0, 0))
            Line((0, 0), (FILLET1_R, 0))
        make_face()
    extrude(amount=21.2, mode=Mode.SUBTRACT)
    with BuildSketch(Plane(origin=(20, -27.559632742, 0.691950058), x_dir=(0, 1, 0), z_dir=(0, 0, 1))) as fillet1_3_piece_6:
        with BuildLine():
            CenterArc((FILLET1_R, FILLET1_R), FILLET1_R, 180, 90)
            Line((0, FILLET1_R), (0, 0))
            Line((0, 0), (FILLET1_R, 0))
        make_face()
    extrude(amount=20, mode=Mode.SUBTRACT)
    with BuildSketch(Plane(origin=(0, -27.559632742, 0.691950058), x_dir=(0, 1, 0), z_dir=(0, 0, 1))) as fillet1_3_piece_7:
        with BuildLine():
            CenterArc((FILLET1_R, -FILLET1_R), FILLET1_R, 90, 90)
            Line((0, -FILLET1_R), (0, 0))
            Line((0, 0), (FILLET1_R, 0))
        make_face()
    extrude(amount=20, mode=Mode.SUBTRACT)
    with BuildSketch(Plane(origin=(20, -49.759632742, 21.691950058), x_dir=(0, 0, 1), z_dir=(0, 1, 0)), Plane(origin=(0, -28.559632742, 21.691950058), x_dir=(0, 0, 1), z_dir=(0, -1, 0))) as fillet1_3_piece_8:
        with BuildLine():
            CenterArc((FILLET1_R, -FILLET1_R), FILLET1_R, 90, 90)
            Line((0, -FILLET1_R), (0, 0))
            Line((0, 0), (FILLET1_R, 0))
        make_face()
    extrude(amount=21.2, mode=Mode.SUBTRACT)
    with BuildSketch(Plane(origin=(0, -28.559632742, 20.691950058), x_dir=(0, 0, 1), z_dir=(0, -1, 0))) as fillet1_3_piece_9:
        with BuildLine():
            CenterArc((1 + FILLET1_R, -FILLET1_R), FILLET1_R, 90, 90)
            Line((1, -FILLET1_R), (1, 0))
            Line((1, 0), (1 + FILLET1_R, 0))
        make_face()
    revolve(axis=Axis((0, -28.559632742, 20.691950058), (-1, 0, 0)), revolution_arc=90, mode=Mode.SUBTRACT)
    with BuildSketch(Plane(origin=(20, -28.559632742, 20.691950058), x_dir=(0, 0, 1), z_dir=(0, -1, 0))) as fillet1_3_piece_10:
        with BuildLine():
            CenterArc((1 + FILLET1_R, FILLET1_R), FILLET1_R, 180, 90)
            Line((1, FILLET1_R), (1, 0))
            Line((1, 0), (1 + FILLET1_R, 0))
        make_face()
    revolve(axis=Axis((20, -28.559632742, 20.691950058), (-1, 0, 0)), revolution_arc=90, mode=Mode.SUBTRACT)
    with BuildSketch(Plane(origin=(0, -28.559632742, 0.691950058), x_dir=(0, 1, 0), z_dir=(0, 0, 1))) as fillet1_3_piece_11:
        with BuildLine():
            CenterArc((1 + FILLET1_R, -FILLET1_R), FILLET1_R, 90, 90)
            Line((1, -FILLET1_R), (1, 0))
            Line((1, 0), (1 + FILLET1_R, 0))
        make_face()
    revolve(axis=Axis((0, -28.559632742, 0.691950058), (-1, 0, 0)), revolution_arc=90, mode=Mode.SUBTRACT)
    with BuildSketch(Plane(origin=(20, -28.559632742, 0.691950058), x_dir=(0, 1, 0), z_dir=(0, 0, 1))) as fillet1_3_piece_12:
        with BuildLine():
            CenterArc((1 + FILLET1_R, FILLET1_R), FILLET1_R, 180, 90)
            Line((1, FILLET1_R), (1, 0))
            Line((1, 0), (1 + FILLET1_R, 0))
        make_face()
    revolve(axis=Axis((20, -28.559632742, 0.691950058), (-1, 0, 0)), revolution_arc=90, mode=Mode.SUBTRACT)


solid = part.part
